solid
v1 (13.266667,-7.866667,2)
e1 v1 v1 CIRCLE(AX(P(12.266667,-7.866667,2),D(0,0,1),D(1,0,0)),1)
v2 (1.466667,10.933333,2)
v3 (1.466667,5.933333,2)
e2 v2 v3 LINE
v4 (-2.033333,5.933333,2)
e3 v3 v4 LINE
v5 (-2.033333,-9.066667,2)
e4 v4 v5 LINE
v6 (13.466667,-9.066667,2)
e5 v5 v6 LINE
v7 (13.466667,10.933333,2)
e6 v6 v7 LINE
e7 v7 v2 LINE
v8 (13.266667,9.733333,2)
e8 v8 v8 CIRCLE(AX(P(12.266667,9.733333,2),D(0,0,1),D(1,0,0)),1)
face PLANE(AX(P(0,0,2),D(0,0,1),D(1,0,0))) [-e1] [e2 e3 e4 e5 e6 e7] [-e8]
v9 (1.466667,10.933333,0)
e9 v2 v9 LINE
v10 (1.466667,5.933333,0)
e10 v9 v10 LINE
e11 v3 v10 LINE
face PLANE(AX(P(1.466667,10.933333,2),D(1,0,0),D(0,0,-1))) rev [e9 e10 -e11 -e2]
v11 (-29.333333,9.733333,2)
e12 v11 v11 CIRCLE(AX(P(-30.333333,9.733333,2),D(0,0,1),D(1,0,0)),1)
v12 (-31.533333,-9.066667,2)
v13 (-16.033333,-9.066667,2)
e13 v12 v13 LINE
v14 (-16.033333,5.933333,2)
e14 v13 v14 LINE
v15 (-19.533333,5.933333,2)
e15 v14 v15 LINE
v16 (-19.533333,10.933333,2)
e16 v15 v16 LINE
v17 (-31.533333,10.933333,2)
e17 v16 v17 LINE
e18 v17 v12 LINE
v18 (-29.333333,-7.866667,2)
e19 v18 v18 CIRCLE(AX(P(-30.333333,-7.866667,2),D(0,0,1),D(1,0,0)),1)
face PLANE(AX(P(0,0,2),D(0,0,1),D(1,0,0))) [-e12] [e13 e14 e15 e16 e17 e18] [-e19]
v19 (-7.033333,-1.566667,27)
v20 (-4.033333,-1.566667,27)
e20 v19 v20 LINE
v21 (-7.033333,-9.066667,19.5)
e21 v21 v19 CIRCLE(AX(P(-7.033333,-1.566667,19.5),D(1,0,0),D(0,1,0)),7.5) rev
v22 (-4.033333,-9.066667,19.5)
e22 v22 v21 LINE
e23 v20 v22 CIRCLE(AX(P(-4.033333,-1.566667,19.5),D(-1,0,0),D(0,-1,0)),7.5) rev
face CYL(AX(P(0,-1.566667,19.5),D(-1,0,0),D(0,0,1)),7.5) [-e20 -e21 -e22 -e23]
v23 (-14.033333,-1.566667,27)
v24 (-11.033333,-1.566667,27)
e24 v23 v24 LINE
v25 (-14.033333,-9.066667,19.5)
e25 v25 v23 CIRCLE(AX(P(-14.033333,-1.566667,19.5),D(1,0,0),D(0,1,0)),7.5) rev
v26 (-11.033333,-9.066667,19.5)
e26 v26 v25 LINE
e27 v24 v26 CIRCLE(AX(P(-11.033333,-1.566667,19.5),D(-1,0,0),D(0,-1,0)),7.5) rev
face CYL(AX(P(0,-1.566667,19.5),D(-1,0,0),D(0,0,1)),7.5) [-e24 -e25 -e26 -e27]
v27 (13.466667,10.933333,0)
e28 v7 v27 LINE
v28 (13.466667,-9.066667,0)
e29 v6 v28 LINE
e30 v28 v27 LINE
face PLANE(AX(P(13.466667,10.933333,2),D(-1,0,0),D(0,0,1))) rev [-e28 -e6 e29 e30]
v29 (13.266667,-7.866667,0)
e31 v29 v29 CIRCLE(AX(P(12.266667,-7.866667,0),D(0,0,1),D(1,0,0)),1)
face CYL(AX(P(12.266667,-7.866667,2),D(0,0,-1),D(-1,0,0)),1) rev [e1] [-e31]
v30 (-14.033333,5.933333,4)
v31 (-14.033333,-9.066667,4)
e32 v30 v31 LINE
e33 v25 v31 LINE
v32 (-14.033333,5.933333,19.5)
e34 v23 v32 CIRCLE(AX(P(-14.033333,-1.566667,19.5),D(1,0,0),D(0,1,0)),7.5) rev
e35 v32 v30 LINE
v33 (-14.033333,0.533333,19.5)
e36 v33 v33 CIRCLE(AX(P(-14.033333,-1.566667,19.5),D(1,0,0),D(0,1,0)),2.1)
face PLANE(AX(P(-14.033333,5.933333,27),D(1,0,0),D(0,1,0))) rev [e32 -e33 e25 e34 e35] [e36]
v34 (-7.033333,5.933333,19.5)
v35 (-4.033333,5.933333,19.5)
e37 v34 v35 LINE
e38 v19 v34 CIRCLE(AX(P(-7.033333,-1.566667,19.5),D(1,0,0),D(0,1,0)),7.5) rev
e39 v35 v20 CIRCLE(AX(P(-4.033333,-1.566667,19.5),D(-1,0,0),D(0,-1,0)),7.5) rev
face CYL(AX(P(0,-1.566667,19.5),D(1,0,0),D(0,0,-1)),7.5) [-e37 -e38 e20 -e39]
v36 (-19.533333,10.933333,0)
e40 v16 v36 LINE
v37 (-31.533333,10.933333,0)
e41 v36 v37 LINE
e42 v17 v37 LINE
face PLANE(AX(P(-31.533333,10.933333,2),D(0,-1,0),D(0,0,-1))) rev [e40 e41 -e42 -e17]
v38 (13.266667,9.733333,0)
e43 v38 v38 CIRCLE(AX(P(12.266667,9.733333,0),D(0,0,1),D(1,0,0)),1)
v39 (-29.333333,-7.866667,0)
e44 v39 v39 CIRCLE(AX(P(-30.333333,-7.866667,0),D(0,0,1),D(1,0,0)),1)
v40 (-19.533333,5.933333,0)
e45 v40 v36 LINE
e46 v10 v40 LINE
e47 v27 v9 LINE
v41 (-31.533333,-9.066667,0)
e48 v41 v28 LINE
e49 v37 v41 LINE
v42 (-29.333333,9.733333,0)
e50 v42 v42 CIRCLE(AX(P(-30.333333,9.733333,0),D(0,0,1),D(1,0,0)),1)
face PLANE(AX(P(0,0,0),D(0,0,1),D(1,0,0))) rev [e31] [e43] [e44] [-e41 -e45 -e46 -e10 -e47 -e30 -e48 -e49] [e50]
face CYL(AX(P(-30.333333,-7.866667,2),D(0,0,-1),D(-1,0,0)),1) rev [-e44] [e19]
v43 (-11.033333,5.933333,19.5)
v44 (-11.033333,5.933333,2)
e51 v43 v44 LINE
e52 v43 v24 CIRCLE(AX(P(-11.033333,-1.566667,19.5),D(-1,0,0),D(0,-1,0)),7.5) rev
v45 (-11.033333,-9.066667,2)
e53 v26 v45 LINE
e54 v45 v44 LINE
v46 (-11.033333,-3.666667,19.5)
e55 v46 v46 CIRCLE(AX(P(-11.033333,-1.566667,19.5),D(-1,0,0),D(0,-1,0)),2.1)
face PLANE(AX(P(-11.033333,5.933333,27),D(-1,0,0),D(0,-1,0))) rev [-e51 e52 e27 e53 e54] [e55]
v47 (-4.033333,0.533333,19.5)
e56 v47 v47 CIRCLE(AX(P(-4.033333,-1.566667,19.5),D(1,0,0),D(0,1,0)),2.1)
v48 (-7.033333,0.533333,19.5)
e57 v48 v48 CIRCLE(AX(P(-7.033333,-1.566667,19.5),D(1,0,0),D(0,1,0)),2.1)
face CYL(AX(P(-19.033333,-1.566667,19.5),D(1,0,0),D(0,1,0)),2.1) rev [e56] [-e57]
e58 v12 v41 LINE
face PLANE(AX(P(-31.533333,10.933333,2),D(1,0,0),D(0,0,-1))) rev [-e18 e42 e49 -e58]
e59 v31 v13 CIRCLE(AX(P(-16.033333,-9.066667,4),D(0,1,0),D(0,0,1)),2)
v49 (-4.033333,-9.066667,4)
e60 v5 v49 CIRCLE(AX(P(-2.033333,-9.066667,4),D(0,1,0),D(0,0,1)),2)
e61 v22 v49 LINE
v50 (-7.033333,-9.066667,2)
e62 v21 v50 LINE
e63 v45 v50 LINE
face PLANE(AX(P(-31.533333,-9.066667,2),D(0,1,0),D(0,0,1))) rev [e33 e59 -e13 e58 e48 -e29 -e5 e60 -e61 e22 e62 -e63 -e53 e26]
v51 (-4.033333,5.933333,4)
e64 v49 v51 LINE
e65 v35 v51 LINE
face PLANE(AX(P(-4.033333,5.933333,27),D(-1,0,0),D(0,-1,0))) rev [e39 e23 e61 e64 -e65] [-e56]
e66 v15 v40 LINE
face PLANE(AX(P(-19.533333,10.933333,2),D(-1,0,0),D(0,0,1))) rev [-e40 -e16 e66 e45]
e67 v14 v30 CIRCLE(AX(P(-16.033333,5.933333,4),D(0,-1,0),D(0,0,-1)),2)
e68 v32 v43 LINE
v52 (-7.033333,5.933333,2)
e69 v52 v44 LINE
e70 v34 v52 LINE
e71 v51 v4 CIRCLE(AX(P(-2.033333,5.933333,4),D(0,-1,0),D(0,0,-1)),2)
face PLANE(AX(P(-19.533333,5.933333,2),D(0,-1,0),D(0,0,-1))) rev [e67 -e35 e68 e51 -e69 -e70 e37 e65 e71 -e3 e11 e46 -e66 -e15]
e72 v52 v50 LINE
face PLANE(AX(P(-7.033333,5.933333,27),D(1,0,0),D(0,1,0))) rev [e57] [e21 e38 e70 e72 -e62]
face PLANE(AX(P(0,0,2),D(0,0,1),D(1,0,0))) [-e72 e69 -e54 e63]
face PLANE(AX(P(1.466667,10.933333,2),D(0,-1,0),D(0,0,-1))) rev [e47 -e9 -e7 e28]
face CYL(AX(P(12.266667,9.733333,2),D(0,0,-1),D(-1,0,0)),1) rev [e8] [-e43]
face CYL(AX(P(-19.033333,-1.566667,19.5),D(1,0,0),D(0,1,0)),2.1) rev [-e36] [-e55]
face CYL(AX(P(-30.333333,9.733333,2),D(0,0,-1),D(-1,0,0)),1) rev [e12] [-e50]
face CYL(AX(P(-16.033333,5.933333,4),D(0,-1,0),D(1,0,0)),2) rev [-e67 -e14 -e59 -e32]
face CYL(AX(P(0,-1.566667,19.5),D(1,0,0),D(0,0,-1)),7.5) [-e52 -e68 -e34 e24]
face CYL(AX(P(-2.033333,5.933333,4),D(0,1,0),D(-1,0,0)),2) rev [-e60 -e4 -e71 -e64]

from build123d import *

# Parameters (mm, degrees)
SKETCH_1_R          = 1
EXTRUDE_1_DEPTH     = 2
SKETCH_2_W          = 3
SKETCH_2_H          = 15
EXTRUDE_2_DEPTH     = 25
FILLET_1_R          = 7.5
SKETCH_3_R          = 2.1
CUT_EXTRUDE_1_DEPTH = 15
FILLET_2_R          = 2


with BuildPart() as part:
    # 草图1 → 凸台-拉伸1 (new body)
    with BuildSketch(Plane.XY):
        Polygon((1.466666667, 10.933333333), (13.466666667, 10.933333333), (13.466666667, -9.066666667), (-31.533333333, -9.066666667), (-31.533333333, 10.933333333), (-19.533333333, 10.933333333), (-19.533333333, 5.933333333), (1.466666667, 5.933333333), align=None)
        with Locations((-30.333333333, 9.733333333)):
            Circle(SKETCH_1_R, mode=Mode.SUBTRACT)
        with Locations((-30.333333333, -7.866666667)):
            Circle(SKETCH_1_R, mode=Mode.SUBTRACT)
        with Locations((12.266666667, 9.733333333)):
            Circle(SKETCH_1_R, mode=Mode.SUBTRACT)
        with Locations((12.266666667, -7.866666667)):
            Circle(SKETCH_1_R, mode=Mode.SUBTRACT)
    extrude(amount=EXTRUDE_1_DEPTH)

    # 草图2 → 凸台-拉伸2 (add)
    with BuildSketch(Plane.XY.offset(2)):
        with Locations((-12.533333333, -1.566666667)):
            Rectangle(SKETCH_2_W, SKETCH_2_H)
        with Locations((-5.533333333, -1.566666667)):
            Rectangle(SKETCH_2_W, SKETCH_2_H)
    extrude(amount=EXTRUDE_2_DEPTH)

    # 圆角1
    fillet_1_edges = [part.edges().sort_by_distance(p)[0] for p in [
        (-5.533333333, -9.066666667, 27),
        (-12.533333333, -9.066666667, 27),
        (-5.533333333, 5.933333333, 27),
        (-12.533333333, 5.933333333, 27),
    ]]
    fillet(fillet_1_edges, radius=FILLET_1_R - 0.0001)  # a hair under: the kernel refuses the full size

    # 草图3 → 切除-拉伸1 (cut)
    with BuildSketch(Plane(origin=(-4.033333333, 0, 0), x_dir=(0, 0, -1), z_dir=(1, 0, 0))):
        with Locations(Location((-19.5, -1.566666667, 0), (0, 0, 90))):
            Circle(SKETCH_3_R)
    extrude(amount=-CUT_EXTRUDE_1_DEPTH, mode=Mode.SUBTRACT)

    # 圆角2
    fillet_2_edges = [part.edges().sort_by_distance(p)[0] for p in [
        (-14.033333333, -1.566666667, 2),
        (-4.033333333, -1.566666667, 2),
    ]]
    fillet(fillet_2_edges, radius=FILLET_2_R)


solid = part.part
